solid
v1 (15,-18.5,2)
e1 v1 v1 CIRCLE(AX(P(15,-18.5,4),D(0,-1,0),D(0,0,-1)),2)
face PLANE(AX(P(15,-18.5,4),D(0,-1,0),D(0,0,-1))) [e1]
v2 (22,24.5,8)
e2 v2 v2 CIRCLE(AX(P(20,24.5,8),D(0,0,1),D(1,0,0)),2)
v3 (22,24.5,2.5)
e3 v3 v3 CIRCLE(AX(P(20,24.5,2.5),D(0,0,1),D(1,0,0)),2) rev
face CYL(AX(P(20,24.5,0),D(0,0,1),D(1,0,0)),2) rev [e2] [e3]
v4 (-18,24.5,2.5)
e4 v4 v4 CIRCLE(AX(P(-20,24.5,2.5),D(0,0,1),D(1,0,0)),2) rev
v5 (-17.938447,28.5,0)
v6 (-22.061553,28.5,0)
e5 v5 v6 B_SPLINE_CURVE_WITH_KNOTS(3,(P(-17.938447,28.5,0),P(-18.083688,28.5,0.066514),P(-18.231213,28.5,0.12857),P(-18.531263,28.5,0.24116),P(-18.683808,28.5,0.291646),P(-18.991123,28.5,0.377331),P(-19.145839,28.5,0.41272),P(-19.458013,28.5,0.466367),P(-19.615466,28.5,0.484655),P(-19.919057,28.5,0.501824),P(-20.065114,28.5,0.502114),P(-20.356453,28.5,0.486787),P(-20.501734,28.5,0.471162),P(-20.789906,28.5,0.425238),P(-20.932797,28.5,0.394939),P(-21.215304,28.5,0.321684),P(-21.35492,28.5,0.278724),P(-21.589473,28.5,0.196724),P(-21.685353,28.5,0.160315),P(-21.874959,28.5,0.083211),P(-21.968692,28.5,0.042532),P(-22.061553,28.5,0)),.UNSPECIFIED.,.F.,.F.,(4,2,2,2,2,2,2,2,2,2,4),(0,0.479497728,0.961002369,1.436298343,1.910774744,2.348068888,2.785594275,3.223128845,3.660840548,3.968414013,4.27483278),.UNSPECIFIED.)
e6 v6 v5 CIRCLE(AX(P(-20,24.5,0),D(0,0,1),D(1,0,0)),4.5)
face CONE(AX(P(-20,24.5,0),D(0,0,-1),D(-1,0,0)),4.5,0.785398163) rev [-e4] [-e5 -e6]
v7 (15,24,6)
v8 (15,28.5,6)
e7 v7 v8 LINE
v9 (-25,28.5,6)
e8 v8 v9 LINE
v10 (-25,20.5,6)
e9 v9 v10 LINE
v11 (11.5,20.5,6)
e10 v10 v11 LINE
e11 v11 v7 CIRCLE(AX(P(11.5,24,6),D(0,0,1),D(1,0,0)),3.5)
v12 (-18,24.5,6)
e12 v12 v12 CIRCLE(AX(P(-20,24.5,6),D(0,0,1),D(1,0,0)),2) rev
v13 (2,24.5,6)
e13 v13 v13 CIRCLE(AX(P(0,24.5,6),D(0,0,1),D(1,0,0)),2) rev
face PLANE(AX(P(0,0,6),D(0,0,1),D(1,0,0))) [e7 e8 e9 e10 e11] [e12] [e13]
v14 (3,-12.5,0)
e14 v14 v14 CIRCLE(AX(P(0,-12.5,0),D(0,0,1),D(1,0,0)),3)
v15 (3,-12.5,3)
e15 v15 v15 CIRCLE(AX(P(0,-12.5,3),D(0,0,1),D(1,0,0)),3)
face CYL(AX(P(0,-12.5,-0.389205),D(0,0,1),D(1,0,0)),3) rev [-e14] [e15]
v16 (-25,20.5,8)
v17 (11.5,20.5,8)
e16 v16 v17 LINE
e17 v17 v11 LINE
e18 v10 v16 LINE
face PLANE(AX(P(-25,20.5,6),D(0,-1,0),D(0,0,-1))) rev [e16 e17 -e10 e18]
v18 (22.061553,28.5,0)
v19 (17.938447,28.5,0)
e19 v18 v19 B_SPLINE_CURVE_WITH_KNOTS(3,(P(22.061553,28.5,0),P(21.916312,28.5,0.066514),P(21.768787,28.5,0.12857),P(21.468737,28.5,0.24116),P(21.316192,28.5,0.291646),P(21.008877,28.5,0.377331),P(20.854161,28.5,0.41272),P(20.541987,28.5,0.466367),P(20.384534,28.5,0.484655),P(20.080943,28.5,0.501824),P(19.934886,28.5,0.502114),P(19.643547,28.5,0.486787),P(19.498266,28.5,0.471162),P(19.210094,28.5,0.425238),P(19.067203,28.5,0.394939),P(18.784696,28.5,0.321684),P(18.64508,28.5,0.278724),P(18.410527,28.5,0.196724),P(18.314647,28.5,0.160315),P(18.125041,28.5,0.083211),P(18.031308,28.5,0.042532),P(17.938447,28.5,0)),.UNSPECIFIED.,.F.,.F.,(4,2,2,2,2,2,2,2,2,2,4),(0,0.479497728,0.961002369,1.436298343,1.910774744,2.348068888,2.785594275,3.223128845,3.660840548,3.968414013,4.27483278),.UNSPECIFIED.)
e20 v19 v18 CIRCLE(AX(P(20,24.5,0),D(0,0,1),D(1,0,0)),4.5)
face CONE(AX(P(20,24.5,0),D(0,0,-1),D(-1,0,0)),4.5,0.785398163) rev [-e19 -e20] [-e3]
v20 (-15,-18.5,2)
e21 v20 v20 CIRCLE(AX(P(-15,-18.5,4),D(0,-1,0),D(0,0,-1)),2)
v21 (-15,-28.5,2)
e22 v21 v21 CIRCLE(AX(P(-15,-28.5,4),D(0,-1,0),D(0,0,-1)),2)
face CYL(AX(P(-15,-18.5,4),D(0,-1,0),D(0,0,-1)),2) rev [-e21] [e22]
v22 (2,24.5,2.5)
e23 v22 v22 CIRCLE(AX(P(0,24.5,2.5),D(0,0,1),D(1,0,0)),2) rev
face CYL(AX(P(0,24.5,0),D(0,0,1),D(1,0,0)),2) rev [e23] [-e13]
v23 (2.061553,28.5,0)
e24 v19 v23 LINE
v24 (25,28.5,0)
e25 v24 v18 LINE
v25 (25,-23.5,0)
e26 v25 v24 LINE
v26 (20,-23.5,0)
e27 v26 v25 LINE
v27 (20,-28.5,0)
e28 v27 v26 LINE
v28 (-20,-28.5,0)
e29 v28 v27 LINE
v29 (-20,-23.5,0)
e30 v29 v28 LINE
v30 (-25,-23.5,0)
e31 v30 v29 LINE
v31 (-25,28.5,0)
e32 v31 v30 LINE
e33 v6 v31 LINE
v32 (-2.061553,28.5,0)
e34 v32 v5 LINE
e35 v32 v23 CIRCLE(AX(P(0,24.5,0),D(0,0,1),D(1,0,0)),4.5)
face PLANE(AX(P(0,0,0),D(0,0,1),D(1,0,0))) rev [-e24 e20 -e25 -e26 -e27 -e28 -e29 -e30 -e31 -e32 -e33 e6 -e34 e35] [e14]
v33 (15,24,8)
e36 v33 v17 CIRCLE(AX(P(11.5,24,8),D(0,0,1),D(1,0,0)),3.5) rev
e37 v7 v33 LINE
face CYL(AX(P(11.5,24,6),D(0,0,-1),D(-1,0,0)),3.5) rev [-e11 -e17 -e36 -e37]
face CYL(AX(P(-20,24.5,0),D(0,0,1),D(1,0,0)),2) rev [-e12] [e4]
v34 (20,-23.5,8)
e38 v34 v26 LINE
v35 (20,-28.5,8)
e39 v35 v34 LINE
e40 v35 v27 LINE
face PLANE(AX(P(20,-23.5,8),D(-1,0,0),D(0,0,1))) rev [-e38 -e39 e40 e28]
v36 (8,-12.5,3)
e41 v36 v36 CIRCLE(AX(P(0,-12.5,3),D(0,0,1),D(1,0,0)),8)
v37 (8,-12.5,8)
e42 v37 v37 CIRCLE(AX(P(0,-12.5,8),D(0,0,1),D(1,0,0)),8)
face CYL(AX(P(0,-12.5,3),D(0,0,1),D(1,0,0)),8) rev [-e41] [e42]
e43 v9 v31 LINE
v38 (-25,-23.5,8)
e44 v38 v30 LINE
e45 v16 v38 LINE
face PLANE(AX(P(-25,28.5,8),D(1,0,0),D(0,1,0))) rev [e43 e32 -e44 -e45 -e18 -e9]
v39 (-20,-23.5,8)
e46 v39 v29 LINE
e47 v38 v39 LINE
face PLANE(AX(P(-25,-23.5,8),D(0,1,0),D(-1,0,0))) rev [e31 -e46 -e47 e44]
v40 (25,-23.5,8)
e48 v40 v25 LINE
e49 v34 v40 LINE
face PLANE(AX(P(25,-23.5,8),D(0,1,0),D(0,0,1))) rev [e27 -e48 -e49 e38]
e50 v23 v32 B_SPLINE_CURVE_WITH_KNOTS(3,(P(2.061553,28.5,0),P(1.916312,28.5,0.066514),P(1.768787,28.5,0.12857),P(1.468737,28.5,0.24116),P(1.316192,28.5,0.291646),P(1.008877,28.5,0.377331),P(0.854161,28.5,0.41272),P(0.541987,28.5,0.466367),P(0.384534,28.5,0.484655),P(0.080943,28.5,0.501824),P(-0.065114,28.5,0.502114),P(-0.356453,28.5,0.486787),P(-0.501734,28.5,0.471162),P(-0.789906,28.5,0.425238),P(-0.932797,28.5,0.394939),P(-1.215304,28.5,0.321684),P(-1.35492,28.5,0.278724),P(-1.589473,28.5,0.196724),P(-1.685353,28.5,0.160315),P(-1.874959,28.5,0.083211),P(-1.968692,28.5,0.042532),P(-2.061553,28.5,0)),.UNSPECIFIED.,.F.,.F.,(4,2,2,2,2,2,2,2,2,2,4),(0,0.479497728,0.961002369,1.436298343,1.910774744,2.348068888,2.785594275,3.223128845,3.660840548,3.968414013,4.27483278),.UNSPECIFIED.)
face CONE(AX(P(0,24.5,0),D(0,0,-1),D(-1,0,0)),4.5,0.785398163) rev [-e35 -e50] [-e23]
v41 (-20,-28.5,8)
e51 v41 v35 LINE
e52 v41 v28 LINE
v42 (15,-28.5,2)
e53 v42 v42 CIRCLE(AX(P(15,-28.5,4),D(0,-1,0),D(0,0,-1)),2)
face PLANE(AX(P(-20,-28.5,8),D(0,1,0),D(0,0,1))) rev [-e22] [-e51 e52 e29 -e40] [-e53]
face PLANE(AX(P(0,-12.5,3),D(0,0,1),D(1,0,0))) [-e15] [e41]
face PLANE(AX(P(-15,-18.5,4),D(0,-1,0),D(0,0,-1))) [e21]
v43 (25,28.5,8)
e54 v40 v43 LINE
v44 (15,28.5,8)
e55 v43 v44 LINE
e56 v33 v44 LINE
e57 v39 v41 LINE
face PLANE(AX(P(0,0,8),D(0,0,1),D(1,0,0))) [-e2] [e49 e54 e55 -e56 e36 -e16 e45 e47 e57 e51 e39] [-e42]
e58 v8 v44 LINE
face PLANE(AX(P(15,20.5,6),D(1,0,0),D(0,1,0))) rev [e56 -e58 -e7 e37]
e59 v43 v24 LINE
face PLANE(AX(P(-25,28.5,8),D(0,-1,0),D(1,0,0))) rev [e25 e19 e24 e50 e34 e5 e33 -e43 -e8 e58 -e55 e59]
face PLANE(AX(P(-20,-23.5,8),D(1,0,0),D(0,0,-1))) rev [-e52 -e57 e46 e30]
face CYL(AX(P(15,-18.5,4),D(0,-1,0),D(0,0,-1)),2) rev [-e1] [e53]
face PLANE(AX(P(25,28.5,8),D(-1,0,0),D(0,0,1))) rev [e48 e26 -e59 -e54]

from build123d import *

# Parameters (mm, degrees)
BOSS_EXTRU_1_DEPTH      = 8
ESQUISSE2_R             = 2
ENL_V_MAT_EXTRU_1_DEPTH = 10
ESQUISSE3_R             = 2
ENL_V_MAT_EXTRU_2_DEPTH = 39.745967532
CHANFREIN1_SIZE         = 2.5
ESQUISSE4_R             = 8
ENL_V_MAT_EXTRU_3_DEPTH = 5
ESQUISSE5_R             = 3
ENL_V_MAT_EXTRU_4_DEPTH = 39.23937761
ESQUISSE6_W             = 40
ESQUISSE6_H             = 8
ENL_V_MAT_EXTRU_5_DEPTH = 2
CONG_1_R                = 3.5


with BuildPart() as part:
    # Esquisse1 → Boss.-Extru.1 (new body)
    with BuildSketch(Plane.XY):
        Polygon((-25, -23.5), (-20, -23.5), (-20, -28.5), (20, -28.5), (20, -23.5), (25, -23.5), (25, 28.5), (-25, 28.5), align=None)
    extrude(amount=BOSS_EXTRU_1_DEPTH)

    # Esquisse2 → Enlèv. mat.-Extru.1 (cut)
    with BuildSketch(Plane.XZ.offset(28.5)):
        with Locations(Location((-15, 4, 0), (0, 0, 270))):
            Circle(ESQUISSE2_R)
        with Locations(Location((15, 4, 0), (0, 0, 270))):
            Circle(ESQUISSE2_R)
    extrude(amount=-ENL_V_MAT_EXTRU_1_DEPTH, mode=Mode.SUBTRACT)

    # Esquisse3 → Enlèv. mat.-Extru.2 (cut, through all)
    with BuildSketch(Plane.XY.offset(8)):
        with Locations((-20, 24.5)):
            Circle(ESQUISSE3_R)
        with Locations((20, 24.5)):
            Circle(ESQUISSE3_R)
        with Locations((0, 24.5)):
            Circle(ESQUISSE3_R)
    extrude(amount=-ENL_V_MAT_EXTRU_2_DEPTH, mode=Mode.SUBTRACT)

    # Chanfrein1
    # the kernel refuses this chamfer: 2.5 mm, written as the material it takes off along each edge
    with BuildSketch(Plane(origin=(-20, 24.5, 0), x_dir=(1, 0, 0), z_dir=(0, -1, 0))) as chanfrein1_piece_1:
        Polygon((2 + CHANFREIN1_SIZE, 0), (2, CHANFREIN1_SIZE), (2, 0), align=None)
    revolve(axis=Axis((-20, 24.5, 0), (0, 0, 1)), mode=Mode.SUBTRACT)
    with BuildSketch(Plane(origin=(20, 24.5, 0), x_dir=(1, 0, 0), z_dir=(0, -1, 0))) as chanfrein1_piece_2:
        Polygon((2 + CHANFREIN1_SIZE, 0), (2, CHANFREIN1_SIZE), (2, 0), align=None)
    revolve(axis=Axis((20, 24.5, 0), (0, 0, 1)), mode=Mode.SUBTRACT)
    with BuildSketch(Plane(origin=(0, 24.5, 0), x_dir=(1, 0, 0), z_dir=(0, -1, 0))) as chanfrein1_piece_3:
        Polygon((2 + CHANFREIN1_SIZE, 0), (2, CHANFREIN1_SIZE), (2, 0), align=None)
    revolve(axis=Axis((0, 24.5, 0), (0, 0, 1)), mode=Mode.SUBTRACT)

    # Esquisse4 → Enlèv. mat.-Extru.3 (cut)
    with BuildSketch(Plane.XY.offset(8)):
        with Locations((0, -12.5)):
            Circle(ESQUISSE4_R)
    extrude(amount=-ENL_V_MAT_EXTRU_3_DEPTH, mode=Mode.SUBTRACT)

    # Esquisse5 → Enlèv. mat.-Extru.4 (cut, through all)
    with BuildSketch(Plane.XY.offset(3)):
        with Locations((0, -12.5)):
            Circle(ESQUISSE5_R)
    extrude(amount=-ENL_V_MAT_EXTRU_4_DEPTH, mode=Mode.SUBTRACT)

    # Esquisse6 → Enlèv. mat.-Extru.5 (cut)
    with BuildSketch(Plane.XY.offset(8)):
        with Locations((-5, 24.5)):
            Rectangle(ESQUISSE6_W, ESQUISSE6_H)
    extrude(amount=-ENL_V_MAT_EXTRU_5_DEPTH, mode=Mode.SUBTRACT)

    # Congé1
    cong_1_edges = [part.edges().sort_by_distance(p)[0] for p in [
        (15, 20.5, 7),
    ]]
    fillet(cong_1_edges, radius=CONG_1_R)


solid = part.part
